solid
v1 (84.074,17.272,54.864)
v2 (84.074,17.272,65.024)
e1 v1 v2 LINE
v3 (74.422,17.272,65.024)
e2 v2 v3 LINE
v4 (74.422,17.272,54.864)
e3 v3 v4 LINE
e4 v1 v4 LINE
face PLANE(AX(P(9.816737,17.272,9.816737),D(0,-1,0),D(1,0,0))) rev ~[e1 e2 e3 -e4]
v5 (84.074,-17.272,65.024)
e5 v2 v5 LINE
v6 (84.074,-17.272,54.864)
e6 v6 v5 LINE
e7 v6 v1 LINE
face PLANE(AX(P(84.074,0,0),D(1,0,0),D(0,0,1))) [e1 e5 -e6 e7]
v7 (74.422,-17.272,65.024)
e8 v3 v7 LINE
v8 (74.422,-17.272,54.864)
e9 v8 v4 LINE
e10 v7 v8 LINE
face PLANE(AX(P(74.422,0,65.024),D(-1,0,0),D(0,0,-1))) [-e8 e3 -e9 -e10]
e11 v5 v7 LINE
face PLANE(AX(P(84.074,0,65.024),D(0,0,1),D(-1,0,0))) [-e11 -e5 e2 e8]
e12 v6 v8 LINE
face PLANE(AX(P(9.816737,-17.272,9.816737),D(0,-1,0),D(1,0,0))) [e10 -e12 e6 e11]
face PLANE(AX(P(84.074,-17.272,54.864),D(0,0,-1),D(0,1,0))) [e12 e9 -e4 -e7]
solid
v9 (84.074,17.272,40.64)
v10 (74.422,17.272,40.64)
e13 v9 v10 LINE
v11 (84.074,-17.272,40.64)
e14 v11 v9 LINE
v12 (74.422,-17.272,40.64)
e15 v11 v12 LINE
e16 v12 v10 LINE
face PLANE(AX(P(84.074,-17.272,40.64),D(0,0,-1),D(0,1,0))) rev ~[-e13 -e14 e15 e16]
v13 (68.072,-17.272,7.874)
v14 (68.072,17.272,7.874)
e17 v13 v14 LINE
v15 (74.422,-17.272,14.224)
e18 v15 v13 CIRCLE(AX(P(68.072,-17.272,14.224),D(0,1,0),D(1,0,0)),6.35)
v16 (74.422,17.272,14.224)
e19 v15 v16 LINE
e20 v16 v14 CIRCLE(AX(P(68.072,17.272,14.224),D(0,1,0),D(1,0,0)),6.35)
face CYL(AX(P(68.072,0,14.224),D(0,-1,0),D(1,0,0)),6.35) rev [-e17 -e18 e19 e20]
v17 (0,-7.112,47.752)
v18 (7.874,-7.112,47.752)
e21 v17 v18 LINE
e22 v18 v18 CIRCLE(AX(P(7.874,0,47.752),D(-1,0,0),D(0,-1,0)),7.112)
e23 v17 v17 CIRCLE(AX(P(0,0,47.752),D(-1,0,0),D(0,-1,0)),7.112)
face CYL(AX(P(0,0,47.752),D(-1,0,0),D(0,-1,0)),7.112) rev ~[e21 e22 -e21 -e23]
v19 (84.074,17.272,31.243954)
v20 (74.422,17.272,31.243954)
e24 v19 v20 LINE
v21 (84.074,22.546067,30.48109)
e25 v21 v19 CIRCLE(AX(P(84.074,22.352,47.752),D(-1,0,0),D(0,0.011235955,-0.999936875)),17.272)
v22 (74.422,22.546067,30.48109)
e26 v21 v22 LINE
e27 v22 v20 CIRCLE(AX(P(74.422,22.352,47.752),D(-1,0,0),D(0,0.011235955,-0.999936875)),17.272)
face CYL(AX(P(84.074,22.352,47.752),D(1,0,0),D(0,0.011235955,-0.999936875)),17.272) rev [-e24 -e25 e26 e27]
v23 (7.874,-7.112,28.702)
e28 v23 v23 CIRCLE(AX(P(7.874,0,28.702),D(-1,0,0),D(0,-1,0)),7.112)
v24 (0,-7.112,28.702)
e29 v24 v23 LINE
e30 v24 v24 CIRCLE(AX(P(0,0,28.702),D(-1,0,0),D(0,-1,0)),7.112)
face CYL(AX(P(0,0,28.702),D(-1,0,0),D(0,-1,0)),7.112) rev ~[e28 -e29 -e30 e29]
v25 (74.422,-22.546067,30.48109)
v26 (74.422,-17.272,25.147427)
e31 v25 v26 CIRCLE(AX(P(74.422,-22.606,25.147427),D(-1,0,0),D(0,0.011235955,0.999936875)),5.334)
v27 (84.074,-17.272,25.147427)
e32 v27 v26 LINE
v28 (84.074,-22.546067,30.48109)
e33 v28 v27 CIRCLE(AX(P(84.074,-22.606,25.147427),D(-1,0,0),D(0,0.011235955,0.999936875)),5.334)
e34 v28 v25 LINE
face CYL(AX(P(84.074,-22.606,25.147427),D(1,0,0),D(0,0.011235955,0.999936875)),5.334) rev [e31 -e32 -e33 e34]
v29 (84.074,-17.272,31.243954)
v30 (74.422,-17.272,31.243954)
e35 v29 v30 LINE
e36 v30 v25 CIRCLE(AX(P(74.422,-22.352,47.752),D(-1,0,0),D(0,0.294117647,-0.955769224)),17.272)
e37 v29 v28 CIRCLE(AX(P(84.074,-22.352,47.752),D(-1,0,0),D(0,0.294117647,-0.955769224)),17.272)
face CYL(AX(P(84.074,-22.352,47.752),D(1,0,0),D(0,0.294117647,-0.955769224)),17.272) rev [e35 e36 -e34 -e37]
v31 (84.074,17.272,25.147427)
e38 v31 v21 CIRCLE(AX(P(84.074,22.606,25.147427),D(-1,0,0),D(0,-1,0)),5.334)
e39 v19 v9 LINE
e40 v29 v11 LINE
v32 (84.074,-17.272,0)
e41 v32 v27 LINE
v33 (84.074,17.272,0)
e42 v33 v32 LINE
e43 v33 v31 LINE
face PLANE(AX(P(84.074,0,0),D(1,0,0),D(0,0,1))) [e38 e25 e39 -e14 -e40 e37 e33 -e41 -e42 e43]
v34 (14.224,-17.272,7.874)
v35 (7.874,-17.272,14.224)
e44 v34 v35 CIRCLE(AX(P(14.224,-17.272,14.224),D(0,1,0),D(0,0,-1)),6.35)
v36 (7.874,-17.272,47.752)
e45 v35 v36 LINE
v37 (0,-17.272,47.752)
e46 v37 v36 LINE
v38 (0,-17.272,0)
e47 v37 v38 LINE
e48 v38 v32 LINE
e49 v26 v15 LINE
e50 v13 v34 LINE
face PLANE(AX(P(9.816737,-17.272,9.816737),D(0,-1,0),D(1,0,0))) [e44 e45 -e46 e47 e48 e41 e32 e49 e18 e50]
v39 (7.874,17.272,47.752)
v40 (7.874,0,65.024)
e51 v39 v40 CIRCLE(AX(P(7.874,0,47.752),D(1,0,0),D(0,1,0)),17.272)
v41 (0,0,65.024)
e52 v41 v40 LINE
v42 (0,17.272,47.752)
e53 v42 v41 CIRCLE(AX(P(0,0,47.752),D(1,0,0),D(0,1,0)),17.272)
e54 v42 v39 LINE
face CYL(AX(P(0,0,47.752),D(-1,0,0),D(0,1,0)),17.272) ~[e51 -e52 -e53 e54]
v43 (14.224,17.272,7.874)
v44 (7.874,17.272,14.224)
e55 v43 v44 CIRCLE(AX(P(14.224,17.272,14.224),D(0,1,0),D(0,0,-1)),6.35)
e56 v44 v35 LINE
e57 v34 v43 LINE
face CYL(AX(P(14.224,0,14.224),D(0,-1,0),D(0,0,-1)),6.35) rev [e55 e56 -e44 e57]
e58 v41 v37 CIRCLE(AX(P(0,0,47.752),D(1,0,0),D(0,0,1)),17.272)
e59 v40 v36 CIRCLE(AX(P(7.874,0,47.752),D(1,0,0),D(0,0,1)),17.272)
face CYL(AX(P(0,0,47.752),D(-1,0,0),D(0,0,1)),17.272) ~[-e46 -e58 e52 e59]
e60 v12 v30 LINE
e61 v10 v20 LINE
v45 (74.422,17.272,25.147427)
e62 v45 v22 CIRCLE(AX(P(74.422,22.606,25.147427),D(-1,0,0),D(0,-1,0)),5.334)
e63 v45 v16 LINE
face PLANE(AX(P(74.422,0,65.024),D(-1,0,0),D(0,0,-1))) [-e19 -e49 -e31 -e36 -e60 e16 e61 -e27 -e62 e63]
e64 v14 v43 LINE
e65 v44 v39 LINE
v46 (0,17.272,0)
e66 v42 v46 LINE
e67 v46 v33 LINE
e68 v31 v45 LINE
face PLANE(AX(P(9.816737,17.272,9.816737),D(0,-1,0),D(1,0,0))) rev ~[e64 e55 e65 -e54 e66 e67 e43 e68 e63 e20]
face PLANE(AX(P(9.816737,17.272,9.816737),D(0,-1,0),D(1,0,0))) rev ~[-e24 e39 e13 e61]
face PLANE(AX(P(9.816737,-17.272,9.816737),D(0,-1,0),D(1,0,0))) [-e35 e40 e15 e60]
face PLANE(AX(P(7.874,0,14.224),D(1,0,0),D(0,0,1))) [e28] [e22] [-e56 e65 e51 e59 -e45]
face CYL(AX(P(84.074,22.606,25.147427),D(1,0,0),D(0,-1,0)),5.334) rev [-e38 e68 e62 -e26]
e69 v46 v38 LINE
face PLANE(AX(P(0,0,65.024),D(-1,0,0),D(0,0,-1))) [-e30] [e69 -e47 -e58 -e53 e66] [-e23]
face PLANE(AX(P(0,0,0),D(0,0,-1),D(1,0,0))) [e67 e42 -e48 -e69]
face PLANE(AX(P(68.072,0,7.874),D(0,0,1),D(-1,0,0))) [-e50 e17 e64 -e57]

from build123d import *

# Parameters (mm, degrees)
F1_DEPTH = 17.272
F2_R     = 7.112
F3_DEPTH = 7.874
F5_DEPTH = 9.652
F4_W     = 34.544
F4_H     = 14.224
F6_DEPTH = 9.652


# Not quite as in the source:
# - a feature names something its author has since deleted; it is built from what else it names


with BuildPart() as f1:
    # F0 (on Front) → F1 (new body, symmetric)
    with BuildSketch(Plane.XZ):
        with BuildLine():
            ThreePointArc((14.224, 7.874), (9.7338719395, 9.7338719395), (7.874, 14.224))
            Line((7.874, 14.224), (7.874, 7.874))
            Line((7.874, 7.874), (14.224, 7.874))
        make_face()
        with BuildLine():
            Line((74.422, 7.874), (74.422, 14.224))
            ThreePointArc((74.422, 14.224), (72.5621280605, 9.7338719395), (68.072, 7.874))
            Line((68.072, 7.874), (74.422, 7.874))
        make_face()
        Polygon((0, 65.024), (0, 0), (84.074, 0), (84.074, 65.024), (74.422, 65.024), (74.422, 14.224), (74.422, 7.874), (68.072, 7.874), (14.224, 7.874), (7.874, 7.874), (7.874, 14.224), (7.874, 65.024), align=None)
    extrude(amount=F1_DEPTH, both=True)

    # F2 (on face) → F3 (cut, through all)
    with BuildSketch(Plane(origin=(0, 0, 0), x_dir=(0, -1, 0), z_dir=(-1, 0, 0))):
        with BuildLine():
            ThreePointArc((-17.272, 47.752), (-12.2131483247, 59.9651483247), (0, 65.024))
            Line((0, 65.024), (-17.272, 65.024))
            Line((-17.272, 65.024), (-17.272, 47.752))
        make_face()
        with BuildLine():
            ThreePointArc((0, 65.024), (12.2131483247, 59.9651483247), (17.272, 47.752))
            Line((17.272, 47.752), (17.272, 65.024))
            Line((17.272, 65.024), (0, 65.024))
        make_face()
        with Locations((0, 47.752)):
            Circle(F2_R)
        with Locations((0, 28.702)):
            Circle(F2_R)
    extrude(amount=-F3_DEPTH, mode=Mode.SUBTRACT)

    # F4 (on face) → F5 (join, through all)
    with BuildSketch(Plane.YZ.offset(84.074)):
        with BuildLine():
            Line((-17.272, 25.5601424724), (-17.272, 31.2439539618))
            ThreePointArc((-17.272, 31.2439539618), (-19.8794356336, 30.6578954767), (-22.5460674157, 30.4810903008))
            ThreePointArc((-22.5460674157, 30.4810903008), (-18.8131622494, 28.8978853564), (-17.272, 25.1474270113))
            Line((-17.272, 25.1474270113), (-17.272, 25.5601424724))
        make_face()
        with BuildLine():
            ThreePointArc((22.5460674157, 30.4810903008), (19.8794356336, 30.6578954767), (17.272, 31.2439539618))
            Line((17.272, 31.2439539618), (17.272, 30.48))
            Line((17.272, 30.48), (17.272, 25.1474270113))
            ThreePointArc((17.272, 25.1474270113), (18.8131622494, 28.8978853564), (22.5460674157, 30.4810903008))
        make_face()
    extrude(amount=-F5_DEPTH)

    # F4 (on face) → F6 (cut, through all)
    with BuildSketch(Plane.YZ.offset(84.074)):
        with Locations((0, 47.752)):
            Rectangle(F4_W, F4_H)
    extrude(amount=-F6_DEPTH, mode=Mode.SUBTRACT)


solid = f1.part
